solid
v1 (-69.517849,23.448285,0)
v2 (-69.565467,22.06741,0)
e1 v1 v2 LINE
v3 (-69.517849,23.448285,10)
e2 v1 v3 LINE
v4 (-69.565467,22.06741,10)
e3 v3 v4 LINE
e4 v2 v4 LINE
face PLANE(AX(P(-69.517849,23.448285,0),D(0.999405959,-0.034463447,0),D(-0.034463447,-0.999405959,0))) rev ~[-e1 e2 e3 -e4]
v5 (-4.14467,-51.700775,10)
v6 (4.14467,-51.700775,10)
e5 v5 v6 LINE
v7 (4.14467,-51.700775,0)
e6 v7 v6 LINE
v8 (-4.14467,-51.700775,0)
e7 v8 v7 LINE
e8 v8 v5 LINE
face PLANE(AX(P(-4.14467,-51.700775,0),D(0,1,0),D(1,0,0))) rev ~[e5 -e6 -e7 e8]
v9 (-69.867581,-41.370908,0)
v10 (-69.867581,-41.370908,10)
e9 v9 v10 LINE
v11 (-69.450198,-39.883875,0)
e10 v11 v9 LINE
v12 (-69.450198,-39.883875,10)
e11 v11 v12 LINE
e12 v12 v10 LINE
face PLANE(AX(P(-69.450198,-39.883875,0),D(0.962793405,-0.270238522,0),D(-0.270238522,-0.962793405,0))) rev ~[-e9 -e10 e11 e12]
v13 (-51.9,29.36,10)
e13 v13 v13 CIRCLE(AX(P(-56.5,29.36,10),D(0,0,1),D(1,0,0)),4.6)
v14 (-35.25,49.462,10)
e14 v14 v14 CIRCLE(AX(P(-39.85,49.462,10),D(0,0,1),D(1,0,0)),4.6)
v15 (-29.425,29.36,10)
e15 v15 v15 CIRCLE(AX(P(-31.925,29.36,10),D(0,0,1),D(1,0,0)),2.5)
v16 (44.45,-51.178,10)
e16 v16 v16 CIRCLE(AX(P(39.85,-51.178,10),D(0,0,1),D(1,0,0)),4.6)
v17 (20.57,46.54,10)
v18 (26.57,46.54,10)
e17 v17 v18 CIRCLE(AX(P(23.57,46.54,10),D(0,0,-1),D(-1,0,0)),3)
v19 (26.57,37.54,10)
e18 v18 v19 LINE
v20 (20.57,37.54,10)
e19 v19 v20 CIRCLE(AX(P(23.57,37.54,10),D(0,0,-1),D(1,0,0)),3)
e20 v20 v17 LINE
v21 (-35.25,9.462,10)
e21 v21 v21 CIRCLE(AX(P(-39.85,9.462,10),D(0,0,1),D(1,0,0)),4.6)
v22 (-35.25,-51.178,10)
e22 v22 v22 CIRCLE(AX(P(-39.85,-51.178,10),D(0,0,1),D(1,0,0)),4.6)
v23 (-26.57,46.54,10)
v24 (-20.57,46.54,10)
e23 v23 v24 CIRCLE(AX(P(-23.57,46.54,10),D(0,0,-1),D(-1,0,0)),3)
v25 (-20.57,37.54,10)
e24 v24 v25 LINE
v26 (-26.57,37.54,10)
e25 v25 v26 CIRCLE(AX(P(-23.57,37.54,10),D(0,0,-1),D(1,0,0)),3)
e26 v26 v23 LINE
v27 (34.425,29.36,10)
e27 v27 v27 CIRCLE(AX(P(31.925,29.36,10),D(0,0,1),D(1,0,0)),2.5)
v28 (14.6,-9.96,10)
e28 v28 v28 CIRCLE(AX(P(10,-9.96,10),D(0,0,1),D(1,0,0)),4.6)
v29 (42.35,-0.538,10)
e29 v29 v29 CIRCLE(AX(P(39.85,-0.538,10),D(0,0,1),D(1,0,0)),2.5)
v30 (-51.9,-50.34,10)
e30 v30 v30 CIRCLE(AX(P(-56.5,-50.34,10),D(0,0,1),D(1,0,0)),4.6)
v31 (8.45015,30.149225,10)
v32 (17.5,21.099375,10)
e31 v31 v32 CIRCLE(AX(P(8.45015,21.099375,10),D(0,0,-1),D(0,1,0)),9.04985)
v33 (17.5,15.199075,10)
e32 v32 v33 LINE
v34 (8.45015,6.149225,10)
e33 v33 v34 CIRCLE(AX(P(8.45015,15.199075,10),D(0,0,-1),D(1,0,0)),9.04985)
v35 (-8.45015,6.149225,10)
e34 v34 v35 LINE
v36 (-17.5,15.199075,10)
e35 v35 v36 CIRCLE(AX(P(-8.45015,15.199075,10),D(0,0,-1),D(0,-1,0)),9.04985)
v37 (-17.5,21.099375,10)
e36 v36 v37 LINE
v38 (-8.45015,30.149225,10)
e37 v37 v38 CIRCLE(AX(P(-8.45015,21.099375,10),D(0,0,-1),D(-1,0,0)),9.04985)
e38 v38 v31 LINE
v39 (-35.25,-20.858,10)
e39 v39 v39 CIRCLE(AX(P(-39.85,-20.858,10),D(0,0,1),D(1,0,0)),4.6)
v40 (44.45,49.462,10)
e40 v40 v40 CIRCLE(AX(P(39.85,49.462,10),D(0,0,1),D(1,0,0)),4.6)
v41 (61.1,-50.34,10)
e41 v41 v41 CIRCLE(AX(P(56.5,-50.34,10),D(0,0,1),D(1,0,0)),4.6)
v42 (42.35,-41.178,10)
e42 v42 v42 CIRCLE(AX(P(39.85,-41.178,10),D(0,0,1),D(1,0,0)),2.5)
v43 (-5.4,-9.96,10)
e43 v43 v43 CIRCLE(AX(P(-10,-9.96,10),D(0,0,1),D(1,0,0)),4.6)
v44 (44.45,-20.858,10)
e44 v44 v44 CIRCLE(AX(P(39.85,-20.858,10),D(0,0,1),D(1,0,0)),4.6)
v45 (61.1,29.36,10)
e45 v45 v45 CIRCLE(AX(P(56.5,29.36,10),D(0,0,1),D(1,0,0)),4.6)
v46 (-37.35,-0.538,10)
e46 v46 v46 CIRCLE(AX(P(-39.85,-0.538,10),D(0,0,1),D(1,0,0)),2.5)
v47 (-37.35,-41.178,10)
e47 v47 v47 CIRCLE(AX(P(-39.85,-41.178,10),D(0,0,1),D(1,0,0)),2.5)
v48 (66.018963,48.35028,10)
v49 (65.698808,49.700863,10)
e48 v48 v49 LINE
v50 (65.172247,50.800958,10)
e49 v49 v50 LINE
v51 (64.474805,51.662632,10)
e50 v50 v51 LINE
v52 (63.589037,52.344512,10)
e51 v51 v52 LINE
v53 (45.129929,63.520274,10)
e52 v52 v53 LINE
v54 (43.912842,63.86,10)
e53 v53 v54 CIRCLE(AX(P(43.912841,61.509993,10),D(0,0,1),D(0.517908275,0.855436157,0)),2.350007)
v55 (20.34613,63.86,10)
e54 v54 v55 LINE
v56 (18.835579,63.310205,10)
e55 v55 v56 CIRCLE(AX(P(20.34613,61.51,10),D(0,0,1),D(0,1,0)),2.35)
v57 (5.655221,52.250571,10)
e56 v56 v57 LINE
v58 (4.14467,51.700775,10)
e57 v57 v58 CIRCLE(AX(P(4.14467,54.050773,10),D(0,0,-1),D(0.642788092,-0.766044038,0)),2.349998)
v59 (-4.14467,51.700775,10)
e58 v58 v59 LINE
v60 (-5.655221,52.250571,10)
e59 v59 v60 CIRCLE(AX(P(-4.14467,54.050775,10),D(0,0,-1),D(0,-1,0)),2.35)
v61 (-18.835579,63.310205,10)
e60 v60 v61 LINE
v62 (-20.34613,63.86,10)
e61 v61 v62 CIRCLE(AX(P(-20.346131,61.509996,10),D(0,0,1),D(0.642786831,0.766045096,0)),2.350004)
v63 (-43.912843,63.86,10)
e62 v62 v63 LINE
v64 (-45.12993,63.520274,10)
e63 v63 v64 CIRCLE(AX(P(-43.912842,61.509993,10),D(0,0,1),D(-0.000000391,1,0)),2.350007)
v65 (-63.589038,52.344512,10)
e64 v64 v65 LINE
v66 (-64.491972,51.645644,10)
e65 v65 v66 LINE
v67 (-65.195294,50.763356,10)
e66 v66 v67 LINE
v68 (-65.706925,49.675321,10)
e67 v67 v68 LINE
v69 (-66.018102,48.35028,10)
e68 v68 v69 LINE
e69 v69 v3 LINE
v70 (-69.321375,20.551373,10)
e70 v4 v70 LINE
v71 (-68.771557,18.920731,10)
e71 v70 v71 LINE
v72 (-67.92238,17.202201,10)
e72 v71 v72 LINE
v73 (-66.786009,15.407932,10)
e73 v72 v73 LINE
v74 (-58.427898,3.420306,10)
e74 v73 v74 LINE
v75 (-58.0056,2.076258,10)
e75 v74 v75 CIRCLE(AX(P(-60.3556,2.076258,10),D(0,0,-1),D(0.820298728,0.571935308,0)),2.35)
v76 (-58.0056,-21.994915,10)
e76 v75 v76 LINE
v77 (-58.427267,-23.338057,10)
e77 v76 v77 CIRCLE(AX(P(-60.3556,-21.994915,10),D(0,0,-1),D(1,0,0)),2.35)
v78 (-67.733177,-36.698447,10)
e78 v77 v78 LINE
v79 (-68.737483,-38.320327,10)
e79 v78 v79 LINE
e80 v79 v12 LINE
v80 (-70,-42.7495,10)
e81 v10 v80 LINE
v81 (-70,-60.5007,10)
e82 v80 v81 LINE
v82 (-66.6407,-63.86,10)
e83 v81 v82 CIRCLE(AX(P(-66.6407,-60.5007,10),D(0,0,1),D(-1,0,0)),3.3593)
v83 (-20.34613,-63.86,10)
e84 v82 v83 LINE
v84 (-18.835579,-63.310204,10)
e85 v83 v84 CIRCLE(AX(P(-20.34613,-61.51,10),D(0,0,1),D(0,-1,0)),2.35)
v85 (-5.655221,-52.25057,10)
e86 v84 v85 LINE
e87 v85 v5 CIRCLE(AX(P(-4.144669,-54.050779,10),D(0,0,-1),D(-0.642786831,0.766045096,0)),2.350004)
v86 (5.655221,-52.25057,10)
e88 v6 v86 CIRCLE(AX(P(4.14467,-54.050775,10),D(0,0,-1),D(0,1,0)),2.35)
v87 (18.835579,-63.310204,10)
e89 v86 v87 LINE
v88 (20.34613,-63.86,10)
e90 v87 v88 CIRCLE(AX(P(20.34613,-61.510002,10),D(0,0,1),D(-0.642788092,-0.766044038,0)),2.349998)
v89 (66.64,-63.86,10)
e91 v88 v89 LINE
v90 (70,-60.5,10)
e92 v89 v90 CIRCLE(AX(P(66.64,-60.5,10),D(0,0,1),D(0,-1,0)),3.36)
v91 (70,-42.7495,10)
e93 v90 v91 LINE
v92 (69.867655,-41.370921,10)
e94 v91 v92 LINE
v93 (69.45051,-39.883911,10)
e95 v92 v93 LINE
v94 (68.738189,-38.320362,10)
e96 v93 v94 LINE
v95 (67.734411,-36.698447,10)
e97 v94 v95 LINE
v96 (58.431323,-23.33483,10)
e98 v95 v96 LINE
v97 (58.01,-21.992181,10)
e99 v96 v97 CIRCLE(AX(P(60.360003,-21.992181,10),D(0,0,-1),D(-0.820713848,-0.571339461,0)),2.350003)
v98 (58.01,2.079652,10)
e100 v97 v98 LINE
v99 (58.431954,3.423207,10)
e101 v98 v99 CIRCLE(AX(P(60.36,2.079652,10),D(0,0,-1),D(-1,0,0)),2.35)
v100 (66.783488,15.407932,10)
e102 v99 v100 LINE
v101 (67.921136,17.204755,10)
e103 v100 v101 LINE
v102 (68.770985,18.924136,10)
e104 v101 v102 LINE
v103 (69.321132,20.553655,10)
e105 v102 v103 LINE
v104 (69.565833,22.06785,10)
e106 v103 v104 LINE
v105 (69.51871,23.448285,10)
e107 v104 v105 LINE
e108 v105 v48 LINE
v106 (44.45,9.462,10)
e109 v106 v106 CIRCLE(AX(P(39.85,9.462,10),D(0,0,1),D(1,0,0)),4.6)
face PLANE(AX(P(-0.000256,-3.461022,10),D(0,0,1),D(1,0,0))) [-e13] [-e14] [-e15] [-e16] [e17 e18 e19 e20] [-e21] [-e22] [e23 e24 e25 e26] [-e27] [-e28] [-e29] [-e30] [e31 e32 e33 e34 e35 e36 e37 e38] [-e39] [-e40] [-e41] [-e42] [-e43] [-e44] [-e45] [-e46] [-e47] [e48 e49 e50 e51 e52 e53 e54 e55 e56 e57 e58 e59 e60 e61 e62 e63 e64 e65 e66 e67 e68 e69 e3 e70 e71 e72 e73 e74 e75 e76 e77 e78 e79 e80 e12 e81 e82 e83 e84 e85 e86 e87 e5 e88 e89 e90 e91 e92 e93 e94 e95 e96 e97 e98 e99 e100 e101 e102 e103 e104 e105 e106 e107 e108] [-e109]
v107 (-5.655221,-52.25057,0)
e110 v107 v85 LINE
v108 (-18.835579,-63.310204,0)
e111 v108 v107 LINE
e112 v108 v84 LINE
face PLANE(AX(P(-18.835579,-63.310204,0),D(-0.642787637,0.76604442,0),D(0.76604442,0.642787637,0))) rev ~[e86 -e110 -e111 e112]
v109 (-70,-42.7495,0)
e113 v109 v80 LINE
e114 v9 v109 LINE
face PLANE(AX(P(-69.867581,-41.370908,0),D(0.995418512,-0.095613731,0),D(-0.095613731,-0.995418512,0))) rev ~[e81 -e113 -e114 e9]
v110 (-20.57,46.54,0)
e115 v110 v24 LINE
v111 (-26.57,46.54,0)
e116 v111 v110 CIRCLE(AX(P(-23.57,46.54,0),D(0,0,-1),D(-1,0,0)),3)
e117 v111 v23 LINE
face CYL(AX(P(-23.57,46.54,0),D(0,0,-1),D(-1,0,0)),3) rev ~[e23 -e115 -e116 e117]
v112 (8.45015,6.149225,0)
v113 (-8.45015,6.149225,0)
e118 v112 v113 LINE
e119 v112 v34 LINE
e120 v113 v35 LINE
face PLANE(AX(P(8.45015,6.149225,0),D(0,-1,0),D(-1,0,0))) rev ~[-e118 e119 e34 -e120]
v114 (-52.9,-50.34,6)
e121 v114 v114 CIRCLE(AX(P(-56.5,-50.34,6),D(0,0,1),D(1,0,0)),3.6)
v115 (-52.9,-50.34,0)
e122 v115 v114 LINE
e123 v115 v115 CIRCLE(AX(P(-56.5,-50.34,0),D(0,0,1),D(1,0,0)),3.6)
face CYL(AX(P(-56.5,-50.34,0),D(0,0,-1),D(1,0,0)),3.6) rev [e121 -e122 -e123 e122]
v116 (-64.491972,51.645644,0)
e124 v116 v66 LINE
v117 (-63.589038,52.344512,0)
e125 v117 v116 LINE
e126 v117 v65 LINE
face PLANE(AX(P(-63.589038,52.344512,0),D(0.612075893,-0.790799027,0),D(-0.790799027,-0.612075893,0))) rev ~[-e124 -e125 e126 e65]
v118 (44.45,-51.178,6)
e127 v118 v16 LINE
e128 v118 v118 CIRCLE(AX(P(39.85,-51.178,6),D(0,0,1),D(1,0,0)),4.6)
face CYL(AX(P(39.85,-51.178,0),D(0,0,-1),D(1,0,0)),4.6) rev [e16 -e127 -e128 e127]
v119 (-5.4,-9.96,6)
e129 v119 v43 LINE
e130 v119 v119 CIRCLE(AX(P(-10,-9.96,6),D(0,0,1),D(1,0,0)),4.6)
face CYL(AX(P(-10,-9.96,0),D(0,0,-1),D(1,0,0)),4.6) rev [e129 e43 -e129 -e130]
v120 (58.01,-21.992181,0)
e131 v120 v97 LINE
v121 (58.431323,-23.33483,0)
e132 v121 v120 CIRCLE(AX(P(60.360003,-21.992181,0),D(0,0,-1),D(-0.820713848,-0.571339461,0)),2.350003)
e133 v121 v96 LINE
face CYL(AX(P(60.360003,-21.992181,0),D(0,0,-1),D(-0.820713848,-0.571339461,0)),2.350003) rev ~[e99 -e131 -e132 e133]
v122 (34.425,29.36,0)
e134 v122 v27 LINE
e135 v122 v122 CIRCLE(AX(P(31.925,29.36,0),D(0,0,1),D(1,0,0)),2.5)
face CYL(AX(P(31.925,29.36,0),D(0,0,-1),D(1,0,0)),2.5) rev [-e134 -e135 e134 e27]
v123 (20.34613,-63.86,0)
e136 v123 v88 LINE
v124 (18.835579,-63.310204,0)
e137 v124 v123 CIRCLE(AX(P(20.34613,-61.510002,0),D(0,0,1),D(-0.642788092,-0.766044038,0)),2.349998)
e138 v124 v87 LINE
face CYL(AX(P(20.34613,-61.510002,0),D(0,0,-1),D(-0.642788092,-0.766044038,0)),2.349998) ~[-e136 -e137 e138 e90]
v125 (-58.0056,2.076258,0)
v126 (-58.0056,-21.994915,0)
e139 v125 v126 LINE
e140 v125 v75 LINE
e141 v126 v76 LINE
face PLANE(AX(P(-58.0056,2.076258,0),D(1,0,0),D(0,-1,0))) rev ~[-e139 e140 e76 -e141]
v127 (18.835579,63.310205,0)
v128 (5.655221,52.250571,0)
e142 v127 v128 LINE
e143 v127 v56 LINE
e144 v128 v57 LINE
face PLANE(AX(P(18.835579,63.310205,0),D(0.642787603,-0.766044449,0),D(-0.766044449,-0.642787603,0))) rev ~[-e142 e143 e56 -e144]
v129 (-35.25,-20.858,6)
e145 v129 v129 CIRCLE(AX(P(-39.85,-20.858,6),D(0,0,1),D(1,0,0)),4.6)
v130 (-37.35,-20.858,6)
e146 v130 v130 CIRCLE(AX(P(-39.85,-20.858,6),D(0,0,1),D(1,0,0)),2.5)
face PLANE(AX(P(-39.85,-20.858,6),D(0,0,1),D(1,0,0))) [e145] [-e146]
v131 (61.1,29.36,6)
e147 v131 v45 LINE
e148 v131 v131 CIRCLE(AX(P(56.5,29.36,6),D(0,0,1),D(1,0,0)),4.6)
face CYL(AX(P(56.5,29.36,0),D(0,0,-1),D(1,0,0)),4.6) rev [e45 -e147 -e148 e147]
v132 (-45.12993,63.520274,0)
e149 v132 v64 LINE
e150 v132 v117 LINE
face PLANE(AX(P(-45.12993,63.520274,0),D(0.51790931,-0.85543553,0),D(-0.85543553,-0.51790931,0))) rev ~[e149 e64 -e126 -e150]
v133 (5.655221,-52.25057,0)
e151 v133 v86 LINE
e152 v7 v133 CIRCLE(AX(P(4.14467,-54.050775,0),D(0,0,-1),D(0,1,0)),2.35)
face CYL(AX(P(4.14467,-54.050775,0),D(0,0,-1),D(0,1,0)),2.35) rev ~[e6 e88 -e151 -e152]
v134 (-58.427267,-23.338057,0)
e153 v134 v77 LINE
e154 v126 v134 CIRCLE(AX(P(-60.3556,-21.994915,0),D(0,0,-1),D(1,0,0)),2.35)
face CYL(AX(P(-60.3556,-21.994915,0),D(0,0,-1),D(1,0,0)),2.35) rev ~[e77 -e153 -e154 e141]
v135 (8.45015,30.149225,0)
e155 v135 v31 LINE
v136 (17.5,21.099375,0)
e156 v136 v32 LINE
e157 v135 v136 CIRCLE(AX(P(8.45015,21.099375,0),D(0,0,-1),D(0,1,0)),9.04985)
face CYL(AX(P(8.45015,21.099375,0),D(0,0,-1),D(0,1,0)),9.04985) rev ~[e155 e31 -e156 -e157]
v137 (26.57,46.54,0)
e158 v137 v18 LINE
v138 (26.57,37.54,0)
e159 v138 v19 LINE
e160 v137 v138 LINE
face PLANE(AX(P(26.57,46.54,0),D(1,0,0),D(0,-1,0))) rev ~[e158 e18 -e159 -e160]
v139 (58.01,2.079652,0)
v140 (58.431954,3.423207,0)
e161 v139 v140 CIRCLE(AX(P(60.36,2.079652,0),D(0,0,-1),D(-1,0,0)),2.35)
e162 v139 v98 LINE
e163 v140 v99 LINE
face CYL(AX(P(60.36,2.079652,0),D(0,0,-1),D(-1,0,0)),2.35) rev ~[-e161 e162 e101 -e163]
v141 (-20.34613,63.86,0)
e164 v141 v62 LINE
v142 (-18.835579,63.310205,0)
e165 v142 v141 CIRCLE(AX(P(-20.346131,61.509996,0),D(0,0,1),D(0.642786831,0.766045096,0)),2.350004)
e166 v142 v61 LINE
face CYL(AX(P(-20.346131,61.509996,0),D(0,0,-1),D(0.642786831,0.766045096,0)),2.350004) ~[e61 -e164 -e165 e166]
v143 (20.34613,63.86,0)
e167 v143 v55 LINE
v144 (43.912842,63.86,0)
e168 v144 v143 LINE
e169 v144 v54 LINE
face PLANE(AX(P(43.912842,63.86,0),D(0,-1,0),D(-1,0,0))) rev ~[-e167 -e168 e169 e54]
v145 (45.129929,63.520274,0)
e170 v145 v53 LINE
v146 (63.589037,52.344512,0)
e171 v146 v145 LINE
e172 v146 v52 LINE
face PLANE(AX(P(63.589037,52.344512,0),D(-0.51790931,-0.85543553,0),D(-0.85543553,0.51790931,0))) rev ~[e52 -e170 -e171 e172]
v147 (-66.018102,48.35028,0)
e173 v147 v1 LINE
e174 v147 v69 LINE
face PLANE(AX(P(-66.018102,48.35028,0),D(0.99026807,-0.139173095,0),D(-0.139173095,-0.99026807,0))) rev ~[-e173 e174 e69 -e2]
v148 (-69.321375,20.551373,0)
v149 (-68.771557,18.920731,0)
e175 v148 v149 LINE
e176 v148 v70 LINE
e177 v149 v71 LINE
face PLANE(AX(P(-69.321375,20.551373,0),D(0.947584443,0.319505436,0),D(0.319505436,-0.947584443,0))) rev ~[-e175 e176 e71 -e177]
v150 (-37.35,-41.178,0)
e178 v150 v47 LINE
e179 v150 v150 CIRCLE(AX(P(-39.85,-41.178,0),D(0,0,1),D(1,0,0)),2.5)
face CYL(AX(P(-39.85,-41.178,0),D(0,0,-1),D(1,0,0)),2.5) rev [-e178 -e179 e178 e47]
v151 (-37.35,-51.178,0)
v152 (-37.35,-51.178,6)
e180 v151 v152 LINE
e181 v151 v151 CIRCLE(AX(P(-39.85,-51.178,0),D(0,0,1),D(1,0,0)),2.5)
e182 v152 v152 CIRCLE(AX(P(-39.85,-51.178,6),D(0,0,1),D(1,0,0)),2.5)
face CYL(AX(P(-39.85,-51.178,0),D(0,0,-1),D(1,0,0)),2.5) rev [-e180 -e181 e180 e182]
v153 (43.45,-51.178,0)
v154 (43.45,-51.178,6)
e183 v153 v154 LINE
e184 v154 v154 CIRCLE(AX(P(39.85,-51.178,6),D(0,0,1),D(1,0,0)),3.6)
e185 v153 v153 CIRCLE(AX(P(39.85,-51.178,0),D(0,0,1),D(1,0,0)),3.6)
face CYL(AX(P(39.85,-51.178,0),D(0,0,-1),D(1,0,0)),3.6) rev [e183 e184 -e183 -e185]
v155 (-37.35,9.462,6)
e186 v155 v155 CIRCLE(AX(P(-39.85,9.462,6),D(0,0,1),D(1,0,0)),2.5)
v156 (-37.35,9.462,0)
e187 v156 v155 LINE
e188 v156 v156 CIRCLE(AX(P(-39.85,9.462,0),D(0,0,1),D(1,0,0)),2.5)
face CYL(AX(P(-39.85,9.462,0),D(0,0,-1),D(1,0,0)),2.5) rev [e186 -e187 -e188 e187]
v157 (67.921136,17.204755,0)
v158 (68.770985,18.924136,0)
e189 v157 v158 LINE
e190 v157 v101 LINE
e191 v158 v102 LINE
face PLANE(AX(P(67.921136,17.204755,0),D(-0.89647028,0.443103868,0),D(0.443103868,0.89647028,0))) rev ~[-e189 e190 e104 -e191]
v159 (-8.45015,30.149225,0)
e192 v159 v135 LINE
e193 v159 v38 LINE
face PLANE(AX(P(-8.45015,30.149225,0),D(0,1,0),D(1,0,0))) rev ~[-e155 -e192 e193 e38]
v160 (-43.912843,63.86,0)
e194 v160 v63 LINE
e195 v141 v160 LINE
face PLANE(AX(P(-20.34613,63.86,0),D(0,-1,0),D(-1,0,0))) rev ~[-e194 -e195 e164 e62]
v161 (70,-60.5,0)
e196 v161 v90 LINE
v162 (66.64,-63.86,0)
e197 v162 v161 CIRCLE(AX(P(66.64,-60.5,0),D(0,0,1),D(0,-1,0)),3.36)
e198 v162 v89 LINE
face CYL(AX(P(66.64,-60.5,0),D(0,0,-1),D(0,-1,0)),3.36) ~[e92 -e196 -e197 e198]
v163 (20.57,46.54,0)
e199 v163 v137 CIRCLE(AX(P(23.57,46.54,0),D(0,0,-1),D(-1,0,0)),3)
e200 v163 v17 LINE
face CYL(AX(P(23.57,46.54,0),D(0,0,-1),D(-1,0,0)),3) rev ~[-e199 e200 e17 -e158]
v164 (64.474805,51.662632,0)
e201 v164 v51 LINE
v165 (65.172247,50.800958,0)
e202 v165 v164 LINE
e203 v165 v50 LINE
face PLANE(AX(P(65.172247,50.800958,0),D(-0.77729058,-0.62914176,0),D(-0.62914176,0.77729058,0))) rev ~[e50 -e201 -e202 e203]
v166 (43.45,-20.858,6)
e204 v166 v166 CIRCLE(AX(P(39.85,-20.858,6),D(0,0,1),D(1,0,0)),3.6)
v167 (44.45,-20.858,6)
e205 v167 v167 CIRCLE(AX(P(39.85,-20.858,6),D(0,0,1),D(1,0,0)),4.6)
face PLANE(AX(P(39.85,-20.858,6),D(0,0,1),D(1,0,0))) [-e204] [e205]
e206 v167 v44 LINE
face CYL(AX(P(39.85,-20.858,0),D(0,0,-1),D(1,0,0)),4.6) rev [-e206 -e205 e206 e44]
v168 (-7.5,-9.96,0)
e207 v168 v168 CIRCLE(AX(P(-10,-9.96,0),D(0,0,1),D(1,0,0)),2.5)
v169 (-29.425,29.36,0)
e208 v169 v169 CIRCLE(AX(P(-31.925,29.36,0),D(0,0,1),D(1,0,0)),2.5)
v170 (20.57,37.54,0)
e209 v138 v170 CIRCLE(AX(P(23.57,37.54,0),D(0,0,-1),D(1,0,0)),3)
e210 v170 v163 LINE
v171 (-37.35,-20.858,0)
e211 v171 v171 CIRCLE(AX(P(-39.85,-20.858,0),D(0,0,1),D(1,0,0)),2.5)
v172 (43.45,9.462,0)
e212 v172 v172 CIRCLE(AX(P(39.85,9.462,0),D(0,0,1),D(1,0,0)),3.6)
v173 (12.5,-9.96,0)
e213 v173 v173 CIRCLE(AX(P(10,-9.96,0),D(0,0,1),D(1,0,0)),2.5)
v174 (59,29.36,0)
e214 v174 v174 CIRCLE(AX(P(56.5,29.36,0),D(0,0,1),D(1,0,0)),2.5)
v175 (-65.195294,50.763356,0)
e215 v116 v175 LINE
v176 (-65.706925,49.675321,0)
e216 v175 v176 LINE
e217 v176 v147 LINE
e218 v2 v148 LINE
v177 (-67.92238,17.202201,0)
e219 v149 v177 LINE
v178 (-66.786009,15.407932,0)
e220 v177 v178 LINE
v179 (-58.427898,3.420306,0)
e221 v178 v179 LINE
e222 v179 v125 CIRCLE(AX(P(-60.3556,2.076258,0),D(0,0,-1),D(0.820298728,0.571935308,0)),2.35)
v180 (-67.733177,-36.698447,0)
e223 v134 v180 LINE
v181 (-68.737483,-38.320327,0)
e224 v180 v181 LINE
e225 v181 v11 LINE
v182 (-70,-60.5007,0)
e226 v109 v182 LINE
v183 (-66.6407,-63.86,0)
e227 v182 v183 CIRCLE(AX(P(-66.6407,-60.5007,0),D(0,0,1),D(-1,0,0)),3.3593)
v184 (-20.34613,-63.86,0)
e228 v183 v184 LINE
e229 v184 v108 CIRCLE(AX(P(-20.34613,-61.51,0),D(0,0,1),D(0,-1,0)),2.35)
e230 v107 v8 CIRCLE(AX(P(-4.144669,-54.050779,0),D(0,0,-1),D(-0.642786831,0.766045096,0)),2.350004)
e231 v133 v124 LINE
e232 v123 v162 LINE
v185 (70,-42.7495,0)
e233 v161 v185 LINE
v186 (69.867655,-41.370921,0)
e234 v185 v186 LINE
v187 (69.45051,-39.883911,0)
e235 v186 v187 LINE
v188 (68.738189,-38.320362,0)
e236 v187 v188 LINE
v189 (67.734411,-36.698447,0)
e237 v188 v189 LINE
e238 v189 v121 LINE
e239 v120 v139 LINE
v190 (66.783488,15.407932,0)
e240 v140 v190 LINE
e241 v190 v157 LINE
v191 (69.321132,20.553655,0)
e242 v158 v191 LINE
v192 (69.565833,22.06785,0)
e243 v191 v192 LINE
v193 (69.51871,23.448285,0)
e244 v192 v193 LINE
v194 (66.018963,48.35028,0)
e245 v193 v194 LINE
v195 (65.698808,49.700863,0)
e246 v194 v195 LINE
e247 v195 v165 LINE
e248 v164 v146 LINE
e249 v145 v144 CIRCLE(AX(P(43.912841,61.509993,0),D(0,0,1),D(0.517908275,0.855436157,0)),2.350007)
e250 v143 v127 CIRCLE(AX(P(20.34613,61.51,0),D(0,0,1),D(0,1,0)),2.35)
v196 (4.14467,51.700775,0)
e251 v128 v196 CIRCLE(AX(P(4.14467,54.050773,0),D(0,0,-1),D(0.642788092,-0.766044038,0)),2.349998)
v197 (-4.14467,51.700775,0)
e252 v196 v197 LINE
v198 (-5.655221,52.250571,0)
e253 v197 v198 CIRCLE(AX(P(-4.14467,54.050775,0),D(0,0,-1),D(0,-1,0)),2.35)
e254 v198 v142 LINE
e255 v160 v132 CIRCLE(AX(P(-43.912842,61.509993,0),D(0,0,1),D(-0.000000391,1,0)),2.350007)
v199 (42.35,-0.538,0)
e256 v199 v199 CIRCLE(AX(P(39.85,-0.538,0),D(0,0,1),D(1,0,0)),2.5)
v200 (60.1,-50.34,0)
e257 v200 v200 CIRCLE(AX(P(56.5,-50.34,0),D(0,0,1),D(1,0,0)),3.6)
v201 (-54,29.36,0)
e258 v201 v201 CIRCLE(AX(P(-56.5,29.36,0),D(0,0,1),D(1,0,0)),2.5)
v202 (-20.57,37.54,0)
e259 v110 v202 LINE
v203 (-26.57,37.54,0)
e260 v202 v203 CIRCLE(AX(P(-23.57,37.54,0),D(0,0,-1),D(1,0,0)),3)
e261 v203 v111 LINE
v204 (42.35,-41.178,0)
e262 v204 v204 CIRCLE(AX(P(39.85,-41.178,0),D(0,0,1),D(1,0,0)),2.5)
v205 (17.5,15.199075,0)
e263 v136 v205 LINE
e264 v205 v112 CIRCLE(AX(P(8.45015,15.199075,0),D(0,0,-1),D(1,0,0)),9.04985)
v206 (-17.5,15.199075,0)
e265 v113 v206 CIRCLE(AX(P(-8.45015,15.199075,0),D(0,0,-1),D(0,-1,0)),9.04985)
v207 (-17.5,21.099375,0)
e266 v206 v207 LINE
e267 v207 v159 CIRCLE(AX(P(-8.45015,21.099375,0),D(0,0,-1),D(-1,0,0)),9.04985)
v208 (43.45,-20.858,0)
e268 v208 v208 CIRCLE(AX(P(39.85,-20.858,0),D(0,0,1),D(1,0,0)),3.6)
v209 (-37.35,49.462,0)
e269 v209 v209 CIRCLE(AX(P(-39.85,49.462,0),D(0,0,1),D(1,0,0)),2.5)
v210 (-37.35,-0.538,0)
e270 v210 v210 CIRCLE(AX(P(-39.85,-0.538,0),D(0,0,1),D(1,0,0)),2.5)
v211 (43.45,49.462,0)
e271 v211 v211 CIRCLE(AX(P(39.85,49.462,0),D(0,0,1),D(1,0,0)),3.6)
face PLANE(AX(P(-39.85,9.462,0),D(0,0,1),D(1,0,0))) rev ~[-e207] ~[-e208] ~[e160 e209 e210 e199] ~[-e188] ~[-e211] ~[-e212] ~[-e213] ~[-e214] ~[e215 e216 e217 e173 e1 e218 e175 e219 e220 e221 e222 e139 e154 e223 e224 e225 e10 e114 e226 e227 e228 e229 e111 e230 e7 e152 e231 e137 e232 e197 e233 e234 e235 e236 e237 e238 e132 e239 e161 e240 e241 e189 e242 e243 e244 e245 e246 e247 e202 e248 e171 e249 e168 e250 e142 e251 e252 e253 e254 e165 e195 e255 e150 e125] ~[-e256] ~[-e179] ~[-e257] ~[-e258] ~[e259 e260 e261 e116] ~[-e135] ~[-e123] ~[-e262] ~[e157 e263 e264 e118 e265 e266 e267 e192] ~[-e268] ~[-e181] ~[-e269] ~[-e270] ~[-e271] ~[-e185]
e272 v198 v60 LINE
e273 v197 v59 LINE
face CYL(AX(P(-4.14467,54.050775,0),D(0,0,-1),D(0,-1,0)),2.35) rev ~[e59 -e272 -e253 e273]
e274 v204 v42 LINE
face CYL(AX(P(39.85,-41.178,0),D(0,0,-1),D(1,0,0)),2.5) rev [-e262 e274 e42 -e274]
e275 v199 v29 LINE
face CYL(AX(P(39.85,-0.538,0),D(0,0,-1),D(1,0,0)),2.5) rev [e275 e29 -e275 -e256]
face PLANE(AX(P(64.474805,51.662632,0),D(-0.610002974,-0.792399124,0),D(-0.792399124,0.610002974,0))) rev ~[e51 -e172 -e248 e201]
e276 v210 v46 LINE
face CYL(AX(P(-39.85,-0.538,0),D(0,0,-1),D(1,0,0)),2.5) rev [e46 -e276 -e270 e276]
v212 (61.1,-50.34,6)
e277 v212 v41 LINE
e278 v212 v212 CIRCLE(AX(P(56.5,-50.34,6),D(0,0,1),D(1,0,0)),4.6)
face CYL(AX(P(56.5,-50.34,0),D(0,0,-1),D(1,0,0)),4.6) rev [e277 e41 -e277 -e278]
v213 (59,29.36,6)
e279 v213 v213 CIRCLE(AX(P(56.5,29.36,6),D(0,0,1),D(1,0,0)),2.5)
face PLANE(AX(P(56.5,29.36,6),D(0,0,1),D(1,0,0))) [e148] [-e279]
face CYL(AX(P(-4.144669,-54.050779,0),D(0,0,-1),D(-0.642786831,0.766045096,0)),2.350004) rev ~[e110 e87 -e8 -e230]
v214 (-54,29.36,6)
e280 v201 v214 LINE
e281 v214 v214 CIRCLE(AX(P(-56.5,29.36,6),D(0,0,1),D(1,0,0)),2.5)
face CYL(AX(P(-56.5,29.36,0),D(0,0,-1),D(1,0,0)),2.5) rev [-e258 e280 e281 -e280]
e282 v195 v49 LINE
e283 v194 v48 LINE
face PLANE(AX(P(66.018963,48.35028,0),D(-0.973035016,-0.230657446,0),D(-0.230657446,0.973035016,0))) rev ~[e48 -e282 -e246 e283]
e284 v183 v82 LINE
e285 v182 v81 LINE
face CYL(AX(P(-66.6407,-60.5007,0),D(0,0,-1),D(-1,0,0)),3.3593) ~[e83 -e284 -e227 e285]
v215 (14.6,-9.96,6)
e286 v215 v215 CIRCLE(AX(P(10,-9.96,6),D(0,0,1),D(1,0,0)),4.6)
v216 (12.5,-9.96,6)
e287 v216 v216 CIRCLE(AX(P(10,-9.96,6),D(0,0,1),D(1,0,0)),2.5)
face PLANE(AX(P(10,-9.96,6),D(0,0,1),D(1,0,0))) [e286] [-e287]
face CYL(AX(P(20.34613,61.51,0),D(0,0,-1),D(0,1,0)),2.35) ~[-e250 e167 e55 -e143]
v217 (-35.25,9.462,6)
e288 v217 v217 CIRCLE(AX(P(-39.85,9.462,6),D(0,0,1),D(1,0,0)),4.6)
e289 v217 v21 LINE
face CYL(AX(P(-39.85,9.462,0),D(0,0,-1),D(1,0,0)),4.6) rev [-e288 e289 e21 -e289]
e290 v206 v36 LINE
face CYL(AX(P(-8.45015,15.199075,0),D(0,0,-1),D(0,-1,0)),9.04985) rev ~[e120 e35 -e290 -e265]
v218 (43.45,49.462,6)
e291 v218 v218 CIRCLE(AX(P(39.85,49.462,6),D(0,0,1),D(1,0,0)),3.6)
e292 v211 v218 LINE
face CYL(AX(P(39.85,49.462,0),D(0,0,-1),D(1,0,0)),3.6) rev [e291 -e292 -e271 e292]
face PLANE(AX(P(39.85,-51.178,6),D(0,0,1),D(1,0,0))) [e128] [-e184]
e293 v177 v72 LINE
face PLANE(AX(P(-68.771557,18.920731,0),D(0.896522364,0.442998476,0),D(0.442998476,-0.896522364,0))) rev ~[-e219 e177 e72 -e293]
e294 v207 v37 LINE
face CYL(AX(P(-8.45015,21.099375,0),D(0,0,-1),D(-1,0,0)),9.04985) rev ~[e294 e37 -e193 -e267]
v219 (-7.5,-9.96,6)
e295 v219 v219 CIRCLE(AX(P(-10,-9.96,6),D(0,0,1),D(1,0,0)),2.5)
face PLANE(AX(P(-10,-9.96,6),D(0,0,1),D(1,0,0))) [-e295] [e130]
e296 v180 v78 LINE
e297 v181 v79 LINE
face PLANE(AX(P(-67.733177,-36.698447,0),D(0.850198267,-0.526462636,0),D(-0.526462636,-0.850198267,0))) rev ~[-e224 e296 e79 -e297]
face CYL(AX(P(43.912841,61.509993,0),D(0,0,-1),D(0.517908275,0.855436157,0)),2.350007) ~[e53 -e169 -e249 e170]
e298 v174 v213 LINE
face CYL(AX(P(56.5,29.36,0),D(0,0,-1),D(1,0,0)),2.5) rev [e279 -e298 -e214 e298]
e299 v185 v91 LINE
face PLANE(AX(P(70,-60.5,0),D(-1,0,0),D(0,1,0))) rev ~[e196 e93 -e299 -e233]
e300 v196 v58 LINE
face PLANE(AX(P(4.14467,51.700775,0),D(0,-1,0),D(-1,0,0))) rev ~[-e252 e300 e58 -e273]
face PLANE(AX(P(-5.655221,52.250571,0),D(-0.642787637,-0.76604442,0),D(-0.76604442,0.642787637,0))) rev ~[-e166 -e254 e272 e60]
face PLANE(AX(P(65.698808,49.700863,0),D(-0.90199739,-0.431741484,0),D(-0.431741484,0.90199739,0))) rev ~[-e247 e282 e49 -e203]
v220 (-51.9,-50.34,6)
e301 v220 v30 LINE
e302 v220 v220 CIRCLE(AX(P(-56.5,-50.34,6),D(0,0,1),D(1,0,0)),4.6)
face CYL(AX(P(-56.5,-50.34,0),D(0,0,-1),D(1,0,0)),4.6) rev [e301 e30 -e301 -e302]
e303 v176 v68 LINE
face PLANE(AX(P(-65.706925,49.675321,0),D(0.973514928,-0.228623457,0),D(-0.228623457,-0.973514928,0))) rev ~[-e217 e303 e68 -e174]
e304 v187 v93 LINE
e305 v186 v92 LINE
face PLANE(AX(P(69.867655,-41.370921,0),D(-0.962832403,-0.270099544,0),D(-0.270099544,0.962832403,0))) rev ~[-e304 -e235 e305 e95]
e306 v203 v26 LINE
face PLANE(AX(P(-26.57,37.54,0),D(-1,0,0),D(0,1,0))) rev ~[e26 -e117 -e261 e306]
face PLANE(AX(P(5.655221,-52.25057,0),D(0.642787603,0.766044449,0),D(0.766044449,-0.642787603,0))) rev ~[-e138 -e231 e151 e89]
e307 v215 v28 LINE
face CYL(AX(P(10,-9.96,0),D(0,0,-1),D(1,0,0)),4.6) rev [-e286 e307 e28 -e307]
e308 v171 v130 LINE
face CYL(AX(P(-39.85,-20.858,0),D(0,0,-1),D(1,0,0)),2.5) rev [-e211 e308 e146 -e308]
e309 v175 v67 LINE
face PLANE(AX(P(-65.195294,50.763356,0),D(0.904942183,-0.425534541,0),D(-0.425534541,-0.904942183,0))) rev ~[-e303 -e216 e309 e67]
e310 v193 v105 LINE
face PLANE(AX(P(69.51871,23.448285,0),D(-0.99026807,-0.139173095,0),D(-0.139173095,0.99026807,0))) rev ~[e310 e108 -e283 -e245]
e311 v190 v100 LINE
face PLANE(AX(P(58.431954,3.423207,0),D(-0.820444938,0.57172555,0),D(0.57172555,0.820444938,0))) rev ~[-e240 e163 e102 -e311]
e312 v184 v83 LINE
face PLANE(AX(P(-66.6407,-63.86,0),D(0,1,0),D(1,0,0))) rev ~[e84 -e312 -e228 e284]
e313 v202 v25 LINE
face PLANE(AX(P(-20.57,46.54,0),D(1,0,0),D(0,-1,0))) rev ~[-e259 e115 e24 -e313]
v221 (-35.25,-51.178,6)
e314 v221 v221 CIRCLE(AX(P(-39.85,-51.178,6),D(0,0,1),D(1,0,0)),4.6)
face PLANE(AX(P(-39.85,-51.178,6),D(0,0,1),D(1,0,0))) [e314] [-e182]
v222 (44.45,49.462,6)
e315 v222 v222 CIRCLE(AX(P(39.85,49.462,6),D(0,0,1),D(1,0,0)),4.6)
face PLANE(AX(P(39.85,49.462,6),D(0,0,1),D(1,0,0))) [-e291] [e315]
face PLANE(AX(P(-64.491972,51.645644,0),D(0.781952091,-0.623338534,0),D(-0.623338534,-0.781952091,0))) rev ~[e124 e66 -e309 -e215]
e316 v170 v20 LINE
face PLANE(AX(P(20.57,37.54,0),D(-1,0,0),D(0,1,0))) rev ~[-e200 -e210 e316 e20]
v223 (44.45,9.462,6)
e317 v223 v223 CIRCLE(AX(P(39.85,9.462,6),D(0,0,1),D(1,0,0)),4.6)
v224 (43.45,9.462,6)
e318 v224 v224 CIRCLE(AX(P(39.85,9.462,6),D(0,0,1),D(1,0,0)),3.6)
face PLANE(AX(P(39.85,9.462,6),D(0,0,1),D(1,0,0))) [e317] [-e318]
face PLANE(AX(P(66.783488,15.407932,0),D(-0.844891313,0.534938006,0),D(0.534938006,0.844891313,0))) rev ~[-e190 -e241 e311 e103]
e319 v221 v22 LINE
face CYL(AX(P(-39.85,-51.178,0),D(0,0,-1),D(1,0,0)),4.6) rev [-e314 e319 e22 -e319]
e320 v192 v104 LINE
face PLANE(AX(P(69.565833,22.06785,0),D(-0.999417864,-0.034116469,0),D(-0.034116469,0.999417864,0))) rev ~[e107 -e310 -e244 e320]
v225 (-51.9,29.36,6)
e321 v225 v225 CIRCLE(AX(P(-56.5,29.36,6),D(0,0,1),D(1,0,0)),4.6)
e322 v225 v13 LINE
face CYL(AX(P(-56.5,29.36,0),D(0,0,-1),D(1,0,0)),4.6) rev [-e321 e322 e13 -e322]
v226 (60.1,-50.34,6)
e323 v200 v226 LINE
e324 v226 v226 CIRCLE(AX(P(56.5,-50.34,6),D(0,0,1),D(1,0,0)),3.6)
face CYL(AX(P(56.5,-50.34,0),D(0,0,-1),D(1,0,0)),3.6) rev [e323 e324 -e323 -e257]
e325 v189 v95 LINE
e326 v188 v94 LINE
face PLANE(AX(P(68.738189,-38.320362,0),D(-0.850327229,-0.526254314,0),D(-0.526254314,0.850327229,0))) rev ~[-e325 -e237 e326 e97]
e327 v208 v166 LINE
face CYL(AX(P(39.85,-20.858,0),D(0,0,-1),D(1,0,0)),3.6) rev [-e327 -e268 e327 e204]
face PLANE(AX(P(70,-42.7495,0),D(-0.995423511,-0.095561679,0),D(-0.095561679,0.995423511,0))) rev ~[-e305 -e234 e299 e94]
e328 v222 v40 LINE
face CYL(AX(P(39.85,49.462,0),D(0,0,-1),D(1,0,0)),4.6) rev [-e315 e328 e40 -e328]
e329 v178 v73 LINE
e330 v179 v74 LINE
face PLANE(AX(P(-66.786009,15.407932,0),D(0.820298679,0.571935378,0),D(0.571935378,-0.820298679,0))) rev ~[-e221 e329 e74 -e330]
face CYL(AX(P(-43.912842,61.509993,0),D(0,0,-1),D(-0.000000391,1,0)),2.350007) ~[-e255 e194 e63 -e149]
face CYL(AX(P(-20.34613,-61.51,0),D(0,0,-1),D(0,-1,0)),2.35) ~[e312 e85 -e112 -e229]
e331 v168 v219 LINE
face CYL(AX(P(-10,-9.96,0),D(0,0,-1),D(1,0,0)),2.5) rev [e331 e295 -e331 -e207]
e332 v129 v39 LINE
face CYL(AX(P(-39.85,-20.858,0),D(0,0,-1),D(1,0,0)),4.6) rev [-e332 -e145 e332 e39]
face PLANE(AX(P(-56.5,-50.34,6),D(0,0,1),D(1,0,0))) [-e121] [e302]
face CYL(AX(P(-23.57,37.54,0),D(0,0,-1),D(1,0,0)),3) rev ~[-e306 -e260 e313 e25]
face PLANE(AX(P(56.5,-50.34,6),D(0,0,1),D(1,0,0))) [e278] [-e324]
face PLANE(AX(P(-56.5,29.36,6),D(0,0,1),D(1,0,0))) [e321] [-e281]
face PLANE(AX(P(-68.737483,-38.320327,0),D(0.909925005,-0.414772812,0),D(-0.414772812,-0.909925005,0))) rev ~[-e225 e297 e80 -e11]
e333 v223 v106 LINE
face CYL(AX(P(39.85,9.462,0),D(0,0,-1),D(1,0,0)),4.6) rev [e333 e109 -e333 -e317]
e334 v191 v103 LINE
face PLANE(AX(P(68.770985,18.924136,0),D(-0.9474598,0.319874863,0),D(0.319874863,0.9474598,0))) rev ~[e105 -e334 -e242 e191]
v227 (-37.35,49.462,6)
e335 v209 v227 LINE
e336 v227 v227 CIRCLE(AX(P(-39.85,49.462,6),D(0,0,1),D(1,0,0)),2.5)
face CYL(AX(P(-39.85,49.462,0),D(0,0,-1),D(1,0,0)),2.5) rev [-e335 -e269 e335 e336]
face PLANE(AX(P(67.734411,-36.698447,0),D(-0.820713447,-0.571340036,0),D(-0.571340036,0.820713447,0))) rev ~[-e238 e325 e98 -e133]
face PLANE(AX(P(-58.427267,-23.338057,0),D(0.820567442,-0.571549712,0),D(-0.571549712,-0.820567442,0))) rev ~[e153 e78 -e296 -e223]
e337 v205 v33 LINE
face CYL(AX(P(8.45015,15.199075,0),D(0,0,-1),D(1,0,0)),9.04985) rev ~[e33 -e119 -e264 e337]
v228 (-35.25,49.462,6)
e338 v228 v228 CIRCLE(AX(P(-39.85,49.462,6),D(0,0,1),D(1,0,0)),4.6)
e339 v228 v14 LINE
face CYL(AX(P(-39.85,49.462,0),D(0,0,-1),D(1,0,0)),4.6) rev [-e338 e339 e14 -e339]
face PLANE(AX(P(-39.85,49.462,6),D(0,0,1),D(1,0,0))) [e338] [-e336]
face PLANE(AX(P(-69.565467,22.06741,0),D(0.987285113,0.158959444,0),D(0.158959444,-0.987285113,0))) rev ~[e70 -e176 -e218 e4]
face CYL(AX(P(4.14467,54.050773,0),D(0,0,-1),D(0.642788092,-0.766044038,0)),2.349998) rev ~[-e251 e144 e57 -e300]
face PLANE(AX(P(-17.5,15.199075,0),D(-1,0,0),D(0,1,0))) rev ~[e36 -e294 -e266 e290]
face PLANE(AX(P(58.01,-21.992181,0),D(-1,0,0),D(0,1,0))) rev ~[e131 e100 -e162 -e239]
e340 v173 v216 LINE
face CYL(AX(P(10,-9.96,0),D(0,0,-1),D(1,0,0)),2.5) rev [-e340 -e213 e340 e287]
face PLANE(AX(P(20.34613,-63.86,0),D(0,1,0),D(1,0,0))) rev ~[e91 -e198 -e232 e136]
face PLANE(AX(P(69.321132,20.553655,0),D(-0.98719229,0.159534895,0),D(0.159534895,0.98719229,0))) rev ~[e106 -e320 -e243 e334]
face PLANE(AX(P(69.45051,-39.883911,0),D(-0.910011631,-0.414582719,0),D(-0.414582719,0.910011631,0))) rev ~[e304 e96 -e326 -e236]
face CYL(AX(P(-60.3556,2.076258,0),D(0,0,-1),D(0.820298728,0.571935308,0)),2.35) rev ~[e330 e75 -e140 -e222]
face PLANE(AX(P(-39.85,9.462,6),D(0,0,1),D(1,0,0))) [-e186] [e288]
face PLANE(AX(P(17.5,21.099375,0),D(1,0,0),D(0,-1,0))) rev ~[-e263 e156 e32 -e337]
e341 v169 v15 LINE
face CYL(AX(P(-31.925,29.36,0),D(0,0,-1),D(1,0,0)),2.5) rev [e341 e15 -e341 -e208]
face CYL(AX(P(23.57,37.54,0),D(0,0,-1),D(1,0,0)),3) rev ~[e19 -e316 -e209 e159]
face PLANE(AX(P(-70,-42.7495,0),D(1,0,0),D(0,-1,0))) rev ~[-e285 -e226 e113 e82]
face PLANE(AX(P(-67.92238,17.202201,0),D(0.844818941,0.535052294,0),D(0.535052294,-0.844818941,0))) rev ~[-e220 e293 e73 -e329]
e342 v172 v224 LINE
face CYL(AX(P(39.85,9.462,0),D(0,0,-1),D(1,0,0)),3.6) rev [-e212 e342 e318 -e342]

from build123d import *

# Parameters (mm, degrees)
F0_R     = 4.6
F0_R_2   = 2.5
F1_DEPTH = 10
F0_R_3   = 3.6
F2_DEPTH = 6


# Not quite as in the source:
# - ends of sketch curves that miss each other by under 0.0002 mm in the source are joined


with BuildPart() as f1:
    # F0 (on Top) → F1 (new body)
    with BuildSketch(Plane.XY):
        with BuildLine():
            Line((-45.12993, 63.520274), (-63.589038, 52.344512))
            Line((-63.589038, 52.344512), (-64.491972, 51.645644))
            Line((-64.491972, 51.645644), (-65.195294, 50.763356))
            Line((-65.195294, 50.763356), (-65.706925, 49.675321))
            Line((-65.706925, 49.675321), (-66.018102, 48.35028))
            Line((-66.018102, 48.35028), (-69.517849, 23.448285))
            Line((-69.517849, 23.448285), (-69.565467, 22.06741))
            Line((-69.565467, 22.06741), (-69.321375, 20.551373))
            Line((-69.321375, 20.551373), (-68.771557, 18.920731))
            Line((-68.771557, 18.920731), (-67.92238, 17.202201))
            Line((-67.92238, 17.202201), (-66.786009, 15.407932))
            Line((-66.786009, 15.407932), (-58.427898, 3.420306))
            ThreePointArc((-58.427898, 3.420306), (-58.1136589115, 2.780672761), (-58.0056, 2.076258))
            Line((-58.0056, 2.076258), (-58.0056, -21.994915))
            ThreePointArc((-58.0056, -21.994915), (-58.1134934985, -22.6988030848), (-58.427266754, -23.3380571713))
            Line((-58.427266754, -23.3380571713), (-67.733177, -36.698447))
            Line((-67.733177, -36.698447), (-68.737483, -38.320327))
            Line((-68.737483, -38.320327), (-69.450198, -39.883875))
            Line((-69.450198, -39.883875), (-69.867581, -41.370908))
            Line((-69.867581, -41.370908), (-70, -42.7495))
            Line((-70, -42.7495), (-70, -60.5007))
            ThreePointArc((-70, -60.5007), (-69.01608381, -62.87608381), (-66.6407, -63.86))
            Line((-66.6407, -63.86), (-20.34613, -63.86))
            ThreePointArc((-20.34613, -63.86), (-19.5423824877, -63.718277595), (-18.8355788311, -63.3102042013))
            Line((-18.8355788311, -63.3102042013), (-5.655221, -52.25057))
            ThreePointArc((-5.655221, -52.25057), (-4.9484172103, -51.8424972951), (-4.14467, -51.700775))
            Line((-4.14467, -51.700775), (4.14467, -51.700775))
            ThreePointArc((4.14467, -51.700775), (4.9484172103, -51.8424972951), (5.6552206765, -52.2505703856))
            Line((5.6552206765, -52.2505703856), (18.835579, -63.310204))
            ThreePointArc((18.835579, -63.310204), (19.5423824877, -63.718277595), (20.34613, -63.86))
            Line((20.34613, -63.86), (66.64, -63.86))
            ThreePointArc((66.64, -63.86), (69.0158787848, -62.8758787848), (70, -60.5))
            Line((70, -60.5), (70, -42.7495))
            Line((70, -42.7495), (69.867655, -41.370921))
            Line((69.867655, -41.370921), (69.45051, -39.883911))
            Line((69.45051, -39.883911), (68.738189, -38.320362))
            Line((68.738189, -38.320362), (67.734411, -36.698447))
            Line((67.734411, -36.698447), (58.431323, -23.33483))
            ThreePointArc((58.431323, -23.33483), (58.1178034861, -22.6957823028), (58.01, -21.992181))
            Line((58.01, -21.992181), (58.01, 2.079652))
            ThreePointArc((58.01, 2.079652), (58.1179688317, 2.7837800001), (58.4319542472, 3.4232068277))
            Line((58.4319542472, 3.4232068277), (66.783488, 15.407932))
            Line((66.783488, 15.407932), (67.921136, 17.204755))
            Line((67.921136, 17.204755), (68.770985, 18.924136))
            Line((68.770985, 18.924136), (69.321132, 20.553655))
            Line((69.321132, 20.553655), (69.565833, 22.06785))
            Line((69.565833, 22.06785), (69.51871, 23.448285))
            Line((69.51871, 23.448285), (66.018963, 48.35028))
            Line((66.018963, 48.35028), (65.698808, 49.700863))
            Line((65.698808, 49.700863), (65.172247, 50.800958))
            Line((65.172247, 50.800958), (64.474805, 51.662632))
            Line((64.474805, 51.662632), (63.589037, 52.344512))
            Line((63.589037, 52.344512), (45.129929, 63.520274))
            ThreePointArc((45.129929, 63.520274), (44.5446477821, 63.7734755253), (43.912842, 63.86))
            Line((43.912842, 63.86), (20.34613, 63.86))
            ThreePointArc((20.34613, 63.86), (19.5423827897, 63.7182777049), (18.8355793235, 63.3102046144))
            Line((18.8355793235, 63.3102046144), (5.655221, 52.250571))
            ThreePointArc((5.655221, 52.250571), (4.9484175123, 51.842497405), (4.14467, 51.700775))
            Line((4.14467, 51.700775), (-4.14467, 51.700775))
            ThreePointArc((-4.14467, 51.700775), (-4.9484175123, 51.842497405), (-5.6552211689, 52.2505707987))
            Line((-5.6552211689, 52.2505707987), (-18.835579, 63.310205))
            ThreePointArc((-18.835579, 63.310205), (-19.5423827897, 63.7182777049), (-20.34613, 63.86))
            Line((-20.34613, 63.86), (-43.912843, 63.86))
            ThreePointArc((-43.912843, 63.86), (-44.5446487821, 63.7734755253), (-45.12993, 63.520274))
        make_face()
        with Locations((-56.5, -50.34)):
            Circle(F0_R, mode=Mode.SUBTRACT)
        with Locations((-39.85, -51.178)):
            Circle(F0_R, mode=Mode.SUBTRACT)
        with Locations((-39.85, -41.178)):
            Circle(F0_R_2, mode=Mode.SUBTRACT)
        with Locations((-39.85, -20.858)):
            Circle(F0_R, mode=Mode.SUBTRACT)
        with Locations((-39.85, -0.538)):
            Circle(F0_R_2, mode=Mode.SUBTRACT)
        with Locations((-10, -9.96)):
            Circle(F0_R, mode=Mode.SUBTRACT)
        with Locations((39.85, -51.178)):
            Circle(F0_R, mode=Mode.SUBTRACT)
        with Locations((56.5, -50.34)):
            Circle(F0_R, mode=Mode.SUBTRACT)
        with Locations((39.85, -41.178)):
            Circle(F0_R_2, mode=Mode.SUBTRACT)
        with Locations((10, -9.96)):
            Circle(F0_R, mode=Mode.SUBTRACT)
        with Locations((39.85, -20.858)):
            Circle(F0_R, mode=Mode.SUBTRACT)
        with Locations((39.85, -0.538)):
            Circle(F0_R_2, mode=Mode.SUBTRACT)
        with Locations((-39.85, 9.462)):
            Circle(F0_R, mode=Mode.SUBTRACT)
        with Locations((-56.5, 29.36)):
            Circle(F0_R, mode=Mode.SUBTRACT)
        with Locations((-31.925, 29.36)):
            Circle(F0_R_2, mode=Mode.SUBTRACT)
        with Locations((-39.85, 49.462)):
            Circle(F0_R, mode=Mode.SUBTRACT)
        with BuildLine():
            Line((-26.57, 37.54), (-26.57, 46.54))
            ThreePointArc((-26.57, 46.54), (-23.57, 49.54), (-20.57, 46.54))
            Line((-20.57, 46.54), (-20.57, 37.54))
            ThreePointArc((-20.57, 37.54), (-23.57, 34.54), (-26.57, 37.54))
        make_face(mode=Mode.SUBTRACT)
        with BuildLine():
            Line((-17.5, 15.199075), (-17.5, 21.099375))
            ThreePointArc((-17.5, 21.099375), (-14.8493603037, 27.4985853037), (-8.45015, 30.149225))
            Line((-8.45015, 30.149225), (8.45015, 30.149225))
            ThreePointArc((8.45015, 30.149225), (14.8493603037, 27.4985853037), (17.5, 21.099375))
            Line((17.5, 21.099375), (17.5, 15.199075))
            ThreePointArc((17.5, 15.199075), (14.8493603037, 8.7998646963), (8.45015, 6.149225))
            Line((8.45015, 6.149225), (-8.45015, 6.149225))
            ThreePointArc((-8.45015, 6.149225), (-14.8493603037, 8.7998646963), (-17.5, 15.199075))
        make_face(mode=Mode.SUBTRACT)
        with Locations((31.925, 29.36)):
            Circle(F0_R_2, mode=Mode.SUBTRACT)
        with Locations((39.85, 9.462)):
            Circle(F0_R, mode=Mode.SUBTRACT)
        with Locations((56.5, 29.36)):
            Circle(F0_R, mode=Mode.SUBTRACT)
        with BuildLine():
            Line((20.57, 37.54), (20.57, 46.54))
            ThreePointArc((20.57, 46.54), (23.57, 49.54), (26.57, 46.54))
            Line((26.57, 46.54), (26.57, 37.54))
            ThreePointArc((26.57, 37.54), (23.57, 34.54), (20.57, 37.54))
        make_face(mode=Mode.SUBTRACT)
        with Locations((39.85, 49.462)):
            Circle(F0_R, mode=Mode.SUBTRACT)
    extrude(amount=F1_DEPTH)

    # F0 (on Top) → F2 (join)
    with BuildSketch(Plane.XY):
        with Locations((-39.85, 9.462)):
            Circle(F0_R)
        with Locations((-39.85, 9.462)):
            Circle(F0_R_2, mode=Mode.SUBTRACT)
        with Locations((-39.85, -20.858)):
            Circle(F0_R)
        with Locations((-39.85, -20.858)):
            Circle(F0_R_2, mode=Mode.SUBTRACT)
        with Locations((-39.85, -51.178)):
            Circle(F0_R)
        with Locations((-39.85, -51.178)):
            Circle(F0_R_2, mode=Mode.SUBTRACT)
        with Locations((39.85, -20.858)):
            Circle(F0_R)
        with Locations((39.85, -20.858)):
            Circle(F0_R_3, mode=Mode.SUBTRACT)
        with Locations((39.85, -51.178)):
            Circle(F0_R)
        with Locations((39.85, -51.178)):
            Circle(F0_R_3, mode=Mode.SUBTRACT)
        with Locations((39.85, 9.462)):
            Circle(F0_R)
        with Locations((39.85, 9.462)):
            Circle(F0_R_3, mode=Mode.SUBTRACT)
        with Locations((-39.85, 49.462)):
            Circle(F0_R)
        with Locations((-39.85, 49.462)):
            Circle(F0_R_2, mode=Mode.SUBTRACT)
        with Locations((39.85, 49.462)):
            Circle(F0_R)
        with Locations((39.85, 49.462)):
            Circle(F0_R_3, mode=Mode.SUBTRACT)
        with Locations((-10, -9.96)):
            Circle(F0_R)
        with Locations((-10, -9.96)):
            Circle(F0_R_2, mode=Mode.SUBTRACT)
        with Locations((10, -9.96)):
            Circle(F0_R)
        with Locations((10, -9.96)):
            Circle(F0_R_2, mode=Mode.SUBTRACT)
        with Locations((-56.5, -50.34)):
            Circle(F0_R)
        with Locations((-56.5, -50.34)):
            Circle(F0_R_3, mode=Mode.SUBTRACT)
        with Locations((56.5, 29.36)):
            Circle(F0_R)
        with Locations((56.5, 29.36)):
            Circle(F0_R_2, mode=Mode.SUBTRACT)
        with Locations((56.5, -50.34)):
            Circle(F0_R)
        with Locations((56.5, -50.34)):
            Circle(F0_R_3, mode=Mode.SUBTRACT)
        with Locations((-56.5, 29.36)):
            Circle(F0_R)
        with Locations((-56.5, 29.36)):
            Circle(F0_R_2, mode=Mode.SUBTRACT)
    extrude(amount=F2_DEPTH)


solid = f1.part
